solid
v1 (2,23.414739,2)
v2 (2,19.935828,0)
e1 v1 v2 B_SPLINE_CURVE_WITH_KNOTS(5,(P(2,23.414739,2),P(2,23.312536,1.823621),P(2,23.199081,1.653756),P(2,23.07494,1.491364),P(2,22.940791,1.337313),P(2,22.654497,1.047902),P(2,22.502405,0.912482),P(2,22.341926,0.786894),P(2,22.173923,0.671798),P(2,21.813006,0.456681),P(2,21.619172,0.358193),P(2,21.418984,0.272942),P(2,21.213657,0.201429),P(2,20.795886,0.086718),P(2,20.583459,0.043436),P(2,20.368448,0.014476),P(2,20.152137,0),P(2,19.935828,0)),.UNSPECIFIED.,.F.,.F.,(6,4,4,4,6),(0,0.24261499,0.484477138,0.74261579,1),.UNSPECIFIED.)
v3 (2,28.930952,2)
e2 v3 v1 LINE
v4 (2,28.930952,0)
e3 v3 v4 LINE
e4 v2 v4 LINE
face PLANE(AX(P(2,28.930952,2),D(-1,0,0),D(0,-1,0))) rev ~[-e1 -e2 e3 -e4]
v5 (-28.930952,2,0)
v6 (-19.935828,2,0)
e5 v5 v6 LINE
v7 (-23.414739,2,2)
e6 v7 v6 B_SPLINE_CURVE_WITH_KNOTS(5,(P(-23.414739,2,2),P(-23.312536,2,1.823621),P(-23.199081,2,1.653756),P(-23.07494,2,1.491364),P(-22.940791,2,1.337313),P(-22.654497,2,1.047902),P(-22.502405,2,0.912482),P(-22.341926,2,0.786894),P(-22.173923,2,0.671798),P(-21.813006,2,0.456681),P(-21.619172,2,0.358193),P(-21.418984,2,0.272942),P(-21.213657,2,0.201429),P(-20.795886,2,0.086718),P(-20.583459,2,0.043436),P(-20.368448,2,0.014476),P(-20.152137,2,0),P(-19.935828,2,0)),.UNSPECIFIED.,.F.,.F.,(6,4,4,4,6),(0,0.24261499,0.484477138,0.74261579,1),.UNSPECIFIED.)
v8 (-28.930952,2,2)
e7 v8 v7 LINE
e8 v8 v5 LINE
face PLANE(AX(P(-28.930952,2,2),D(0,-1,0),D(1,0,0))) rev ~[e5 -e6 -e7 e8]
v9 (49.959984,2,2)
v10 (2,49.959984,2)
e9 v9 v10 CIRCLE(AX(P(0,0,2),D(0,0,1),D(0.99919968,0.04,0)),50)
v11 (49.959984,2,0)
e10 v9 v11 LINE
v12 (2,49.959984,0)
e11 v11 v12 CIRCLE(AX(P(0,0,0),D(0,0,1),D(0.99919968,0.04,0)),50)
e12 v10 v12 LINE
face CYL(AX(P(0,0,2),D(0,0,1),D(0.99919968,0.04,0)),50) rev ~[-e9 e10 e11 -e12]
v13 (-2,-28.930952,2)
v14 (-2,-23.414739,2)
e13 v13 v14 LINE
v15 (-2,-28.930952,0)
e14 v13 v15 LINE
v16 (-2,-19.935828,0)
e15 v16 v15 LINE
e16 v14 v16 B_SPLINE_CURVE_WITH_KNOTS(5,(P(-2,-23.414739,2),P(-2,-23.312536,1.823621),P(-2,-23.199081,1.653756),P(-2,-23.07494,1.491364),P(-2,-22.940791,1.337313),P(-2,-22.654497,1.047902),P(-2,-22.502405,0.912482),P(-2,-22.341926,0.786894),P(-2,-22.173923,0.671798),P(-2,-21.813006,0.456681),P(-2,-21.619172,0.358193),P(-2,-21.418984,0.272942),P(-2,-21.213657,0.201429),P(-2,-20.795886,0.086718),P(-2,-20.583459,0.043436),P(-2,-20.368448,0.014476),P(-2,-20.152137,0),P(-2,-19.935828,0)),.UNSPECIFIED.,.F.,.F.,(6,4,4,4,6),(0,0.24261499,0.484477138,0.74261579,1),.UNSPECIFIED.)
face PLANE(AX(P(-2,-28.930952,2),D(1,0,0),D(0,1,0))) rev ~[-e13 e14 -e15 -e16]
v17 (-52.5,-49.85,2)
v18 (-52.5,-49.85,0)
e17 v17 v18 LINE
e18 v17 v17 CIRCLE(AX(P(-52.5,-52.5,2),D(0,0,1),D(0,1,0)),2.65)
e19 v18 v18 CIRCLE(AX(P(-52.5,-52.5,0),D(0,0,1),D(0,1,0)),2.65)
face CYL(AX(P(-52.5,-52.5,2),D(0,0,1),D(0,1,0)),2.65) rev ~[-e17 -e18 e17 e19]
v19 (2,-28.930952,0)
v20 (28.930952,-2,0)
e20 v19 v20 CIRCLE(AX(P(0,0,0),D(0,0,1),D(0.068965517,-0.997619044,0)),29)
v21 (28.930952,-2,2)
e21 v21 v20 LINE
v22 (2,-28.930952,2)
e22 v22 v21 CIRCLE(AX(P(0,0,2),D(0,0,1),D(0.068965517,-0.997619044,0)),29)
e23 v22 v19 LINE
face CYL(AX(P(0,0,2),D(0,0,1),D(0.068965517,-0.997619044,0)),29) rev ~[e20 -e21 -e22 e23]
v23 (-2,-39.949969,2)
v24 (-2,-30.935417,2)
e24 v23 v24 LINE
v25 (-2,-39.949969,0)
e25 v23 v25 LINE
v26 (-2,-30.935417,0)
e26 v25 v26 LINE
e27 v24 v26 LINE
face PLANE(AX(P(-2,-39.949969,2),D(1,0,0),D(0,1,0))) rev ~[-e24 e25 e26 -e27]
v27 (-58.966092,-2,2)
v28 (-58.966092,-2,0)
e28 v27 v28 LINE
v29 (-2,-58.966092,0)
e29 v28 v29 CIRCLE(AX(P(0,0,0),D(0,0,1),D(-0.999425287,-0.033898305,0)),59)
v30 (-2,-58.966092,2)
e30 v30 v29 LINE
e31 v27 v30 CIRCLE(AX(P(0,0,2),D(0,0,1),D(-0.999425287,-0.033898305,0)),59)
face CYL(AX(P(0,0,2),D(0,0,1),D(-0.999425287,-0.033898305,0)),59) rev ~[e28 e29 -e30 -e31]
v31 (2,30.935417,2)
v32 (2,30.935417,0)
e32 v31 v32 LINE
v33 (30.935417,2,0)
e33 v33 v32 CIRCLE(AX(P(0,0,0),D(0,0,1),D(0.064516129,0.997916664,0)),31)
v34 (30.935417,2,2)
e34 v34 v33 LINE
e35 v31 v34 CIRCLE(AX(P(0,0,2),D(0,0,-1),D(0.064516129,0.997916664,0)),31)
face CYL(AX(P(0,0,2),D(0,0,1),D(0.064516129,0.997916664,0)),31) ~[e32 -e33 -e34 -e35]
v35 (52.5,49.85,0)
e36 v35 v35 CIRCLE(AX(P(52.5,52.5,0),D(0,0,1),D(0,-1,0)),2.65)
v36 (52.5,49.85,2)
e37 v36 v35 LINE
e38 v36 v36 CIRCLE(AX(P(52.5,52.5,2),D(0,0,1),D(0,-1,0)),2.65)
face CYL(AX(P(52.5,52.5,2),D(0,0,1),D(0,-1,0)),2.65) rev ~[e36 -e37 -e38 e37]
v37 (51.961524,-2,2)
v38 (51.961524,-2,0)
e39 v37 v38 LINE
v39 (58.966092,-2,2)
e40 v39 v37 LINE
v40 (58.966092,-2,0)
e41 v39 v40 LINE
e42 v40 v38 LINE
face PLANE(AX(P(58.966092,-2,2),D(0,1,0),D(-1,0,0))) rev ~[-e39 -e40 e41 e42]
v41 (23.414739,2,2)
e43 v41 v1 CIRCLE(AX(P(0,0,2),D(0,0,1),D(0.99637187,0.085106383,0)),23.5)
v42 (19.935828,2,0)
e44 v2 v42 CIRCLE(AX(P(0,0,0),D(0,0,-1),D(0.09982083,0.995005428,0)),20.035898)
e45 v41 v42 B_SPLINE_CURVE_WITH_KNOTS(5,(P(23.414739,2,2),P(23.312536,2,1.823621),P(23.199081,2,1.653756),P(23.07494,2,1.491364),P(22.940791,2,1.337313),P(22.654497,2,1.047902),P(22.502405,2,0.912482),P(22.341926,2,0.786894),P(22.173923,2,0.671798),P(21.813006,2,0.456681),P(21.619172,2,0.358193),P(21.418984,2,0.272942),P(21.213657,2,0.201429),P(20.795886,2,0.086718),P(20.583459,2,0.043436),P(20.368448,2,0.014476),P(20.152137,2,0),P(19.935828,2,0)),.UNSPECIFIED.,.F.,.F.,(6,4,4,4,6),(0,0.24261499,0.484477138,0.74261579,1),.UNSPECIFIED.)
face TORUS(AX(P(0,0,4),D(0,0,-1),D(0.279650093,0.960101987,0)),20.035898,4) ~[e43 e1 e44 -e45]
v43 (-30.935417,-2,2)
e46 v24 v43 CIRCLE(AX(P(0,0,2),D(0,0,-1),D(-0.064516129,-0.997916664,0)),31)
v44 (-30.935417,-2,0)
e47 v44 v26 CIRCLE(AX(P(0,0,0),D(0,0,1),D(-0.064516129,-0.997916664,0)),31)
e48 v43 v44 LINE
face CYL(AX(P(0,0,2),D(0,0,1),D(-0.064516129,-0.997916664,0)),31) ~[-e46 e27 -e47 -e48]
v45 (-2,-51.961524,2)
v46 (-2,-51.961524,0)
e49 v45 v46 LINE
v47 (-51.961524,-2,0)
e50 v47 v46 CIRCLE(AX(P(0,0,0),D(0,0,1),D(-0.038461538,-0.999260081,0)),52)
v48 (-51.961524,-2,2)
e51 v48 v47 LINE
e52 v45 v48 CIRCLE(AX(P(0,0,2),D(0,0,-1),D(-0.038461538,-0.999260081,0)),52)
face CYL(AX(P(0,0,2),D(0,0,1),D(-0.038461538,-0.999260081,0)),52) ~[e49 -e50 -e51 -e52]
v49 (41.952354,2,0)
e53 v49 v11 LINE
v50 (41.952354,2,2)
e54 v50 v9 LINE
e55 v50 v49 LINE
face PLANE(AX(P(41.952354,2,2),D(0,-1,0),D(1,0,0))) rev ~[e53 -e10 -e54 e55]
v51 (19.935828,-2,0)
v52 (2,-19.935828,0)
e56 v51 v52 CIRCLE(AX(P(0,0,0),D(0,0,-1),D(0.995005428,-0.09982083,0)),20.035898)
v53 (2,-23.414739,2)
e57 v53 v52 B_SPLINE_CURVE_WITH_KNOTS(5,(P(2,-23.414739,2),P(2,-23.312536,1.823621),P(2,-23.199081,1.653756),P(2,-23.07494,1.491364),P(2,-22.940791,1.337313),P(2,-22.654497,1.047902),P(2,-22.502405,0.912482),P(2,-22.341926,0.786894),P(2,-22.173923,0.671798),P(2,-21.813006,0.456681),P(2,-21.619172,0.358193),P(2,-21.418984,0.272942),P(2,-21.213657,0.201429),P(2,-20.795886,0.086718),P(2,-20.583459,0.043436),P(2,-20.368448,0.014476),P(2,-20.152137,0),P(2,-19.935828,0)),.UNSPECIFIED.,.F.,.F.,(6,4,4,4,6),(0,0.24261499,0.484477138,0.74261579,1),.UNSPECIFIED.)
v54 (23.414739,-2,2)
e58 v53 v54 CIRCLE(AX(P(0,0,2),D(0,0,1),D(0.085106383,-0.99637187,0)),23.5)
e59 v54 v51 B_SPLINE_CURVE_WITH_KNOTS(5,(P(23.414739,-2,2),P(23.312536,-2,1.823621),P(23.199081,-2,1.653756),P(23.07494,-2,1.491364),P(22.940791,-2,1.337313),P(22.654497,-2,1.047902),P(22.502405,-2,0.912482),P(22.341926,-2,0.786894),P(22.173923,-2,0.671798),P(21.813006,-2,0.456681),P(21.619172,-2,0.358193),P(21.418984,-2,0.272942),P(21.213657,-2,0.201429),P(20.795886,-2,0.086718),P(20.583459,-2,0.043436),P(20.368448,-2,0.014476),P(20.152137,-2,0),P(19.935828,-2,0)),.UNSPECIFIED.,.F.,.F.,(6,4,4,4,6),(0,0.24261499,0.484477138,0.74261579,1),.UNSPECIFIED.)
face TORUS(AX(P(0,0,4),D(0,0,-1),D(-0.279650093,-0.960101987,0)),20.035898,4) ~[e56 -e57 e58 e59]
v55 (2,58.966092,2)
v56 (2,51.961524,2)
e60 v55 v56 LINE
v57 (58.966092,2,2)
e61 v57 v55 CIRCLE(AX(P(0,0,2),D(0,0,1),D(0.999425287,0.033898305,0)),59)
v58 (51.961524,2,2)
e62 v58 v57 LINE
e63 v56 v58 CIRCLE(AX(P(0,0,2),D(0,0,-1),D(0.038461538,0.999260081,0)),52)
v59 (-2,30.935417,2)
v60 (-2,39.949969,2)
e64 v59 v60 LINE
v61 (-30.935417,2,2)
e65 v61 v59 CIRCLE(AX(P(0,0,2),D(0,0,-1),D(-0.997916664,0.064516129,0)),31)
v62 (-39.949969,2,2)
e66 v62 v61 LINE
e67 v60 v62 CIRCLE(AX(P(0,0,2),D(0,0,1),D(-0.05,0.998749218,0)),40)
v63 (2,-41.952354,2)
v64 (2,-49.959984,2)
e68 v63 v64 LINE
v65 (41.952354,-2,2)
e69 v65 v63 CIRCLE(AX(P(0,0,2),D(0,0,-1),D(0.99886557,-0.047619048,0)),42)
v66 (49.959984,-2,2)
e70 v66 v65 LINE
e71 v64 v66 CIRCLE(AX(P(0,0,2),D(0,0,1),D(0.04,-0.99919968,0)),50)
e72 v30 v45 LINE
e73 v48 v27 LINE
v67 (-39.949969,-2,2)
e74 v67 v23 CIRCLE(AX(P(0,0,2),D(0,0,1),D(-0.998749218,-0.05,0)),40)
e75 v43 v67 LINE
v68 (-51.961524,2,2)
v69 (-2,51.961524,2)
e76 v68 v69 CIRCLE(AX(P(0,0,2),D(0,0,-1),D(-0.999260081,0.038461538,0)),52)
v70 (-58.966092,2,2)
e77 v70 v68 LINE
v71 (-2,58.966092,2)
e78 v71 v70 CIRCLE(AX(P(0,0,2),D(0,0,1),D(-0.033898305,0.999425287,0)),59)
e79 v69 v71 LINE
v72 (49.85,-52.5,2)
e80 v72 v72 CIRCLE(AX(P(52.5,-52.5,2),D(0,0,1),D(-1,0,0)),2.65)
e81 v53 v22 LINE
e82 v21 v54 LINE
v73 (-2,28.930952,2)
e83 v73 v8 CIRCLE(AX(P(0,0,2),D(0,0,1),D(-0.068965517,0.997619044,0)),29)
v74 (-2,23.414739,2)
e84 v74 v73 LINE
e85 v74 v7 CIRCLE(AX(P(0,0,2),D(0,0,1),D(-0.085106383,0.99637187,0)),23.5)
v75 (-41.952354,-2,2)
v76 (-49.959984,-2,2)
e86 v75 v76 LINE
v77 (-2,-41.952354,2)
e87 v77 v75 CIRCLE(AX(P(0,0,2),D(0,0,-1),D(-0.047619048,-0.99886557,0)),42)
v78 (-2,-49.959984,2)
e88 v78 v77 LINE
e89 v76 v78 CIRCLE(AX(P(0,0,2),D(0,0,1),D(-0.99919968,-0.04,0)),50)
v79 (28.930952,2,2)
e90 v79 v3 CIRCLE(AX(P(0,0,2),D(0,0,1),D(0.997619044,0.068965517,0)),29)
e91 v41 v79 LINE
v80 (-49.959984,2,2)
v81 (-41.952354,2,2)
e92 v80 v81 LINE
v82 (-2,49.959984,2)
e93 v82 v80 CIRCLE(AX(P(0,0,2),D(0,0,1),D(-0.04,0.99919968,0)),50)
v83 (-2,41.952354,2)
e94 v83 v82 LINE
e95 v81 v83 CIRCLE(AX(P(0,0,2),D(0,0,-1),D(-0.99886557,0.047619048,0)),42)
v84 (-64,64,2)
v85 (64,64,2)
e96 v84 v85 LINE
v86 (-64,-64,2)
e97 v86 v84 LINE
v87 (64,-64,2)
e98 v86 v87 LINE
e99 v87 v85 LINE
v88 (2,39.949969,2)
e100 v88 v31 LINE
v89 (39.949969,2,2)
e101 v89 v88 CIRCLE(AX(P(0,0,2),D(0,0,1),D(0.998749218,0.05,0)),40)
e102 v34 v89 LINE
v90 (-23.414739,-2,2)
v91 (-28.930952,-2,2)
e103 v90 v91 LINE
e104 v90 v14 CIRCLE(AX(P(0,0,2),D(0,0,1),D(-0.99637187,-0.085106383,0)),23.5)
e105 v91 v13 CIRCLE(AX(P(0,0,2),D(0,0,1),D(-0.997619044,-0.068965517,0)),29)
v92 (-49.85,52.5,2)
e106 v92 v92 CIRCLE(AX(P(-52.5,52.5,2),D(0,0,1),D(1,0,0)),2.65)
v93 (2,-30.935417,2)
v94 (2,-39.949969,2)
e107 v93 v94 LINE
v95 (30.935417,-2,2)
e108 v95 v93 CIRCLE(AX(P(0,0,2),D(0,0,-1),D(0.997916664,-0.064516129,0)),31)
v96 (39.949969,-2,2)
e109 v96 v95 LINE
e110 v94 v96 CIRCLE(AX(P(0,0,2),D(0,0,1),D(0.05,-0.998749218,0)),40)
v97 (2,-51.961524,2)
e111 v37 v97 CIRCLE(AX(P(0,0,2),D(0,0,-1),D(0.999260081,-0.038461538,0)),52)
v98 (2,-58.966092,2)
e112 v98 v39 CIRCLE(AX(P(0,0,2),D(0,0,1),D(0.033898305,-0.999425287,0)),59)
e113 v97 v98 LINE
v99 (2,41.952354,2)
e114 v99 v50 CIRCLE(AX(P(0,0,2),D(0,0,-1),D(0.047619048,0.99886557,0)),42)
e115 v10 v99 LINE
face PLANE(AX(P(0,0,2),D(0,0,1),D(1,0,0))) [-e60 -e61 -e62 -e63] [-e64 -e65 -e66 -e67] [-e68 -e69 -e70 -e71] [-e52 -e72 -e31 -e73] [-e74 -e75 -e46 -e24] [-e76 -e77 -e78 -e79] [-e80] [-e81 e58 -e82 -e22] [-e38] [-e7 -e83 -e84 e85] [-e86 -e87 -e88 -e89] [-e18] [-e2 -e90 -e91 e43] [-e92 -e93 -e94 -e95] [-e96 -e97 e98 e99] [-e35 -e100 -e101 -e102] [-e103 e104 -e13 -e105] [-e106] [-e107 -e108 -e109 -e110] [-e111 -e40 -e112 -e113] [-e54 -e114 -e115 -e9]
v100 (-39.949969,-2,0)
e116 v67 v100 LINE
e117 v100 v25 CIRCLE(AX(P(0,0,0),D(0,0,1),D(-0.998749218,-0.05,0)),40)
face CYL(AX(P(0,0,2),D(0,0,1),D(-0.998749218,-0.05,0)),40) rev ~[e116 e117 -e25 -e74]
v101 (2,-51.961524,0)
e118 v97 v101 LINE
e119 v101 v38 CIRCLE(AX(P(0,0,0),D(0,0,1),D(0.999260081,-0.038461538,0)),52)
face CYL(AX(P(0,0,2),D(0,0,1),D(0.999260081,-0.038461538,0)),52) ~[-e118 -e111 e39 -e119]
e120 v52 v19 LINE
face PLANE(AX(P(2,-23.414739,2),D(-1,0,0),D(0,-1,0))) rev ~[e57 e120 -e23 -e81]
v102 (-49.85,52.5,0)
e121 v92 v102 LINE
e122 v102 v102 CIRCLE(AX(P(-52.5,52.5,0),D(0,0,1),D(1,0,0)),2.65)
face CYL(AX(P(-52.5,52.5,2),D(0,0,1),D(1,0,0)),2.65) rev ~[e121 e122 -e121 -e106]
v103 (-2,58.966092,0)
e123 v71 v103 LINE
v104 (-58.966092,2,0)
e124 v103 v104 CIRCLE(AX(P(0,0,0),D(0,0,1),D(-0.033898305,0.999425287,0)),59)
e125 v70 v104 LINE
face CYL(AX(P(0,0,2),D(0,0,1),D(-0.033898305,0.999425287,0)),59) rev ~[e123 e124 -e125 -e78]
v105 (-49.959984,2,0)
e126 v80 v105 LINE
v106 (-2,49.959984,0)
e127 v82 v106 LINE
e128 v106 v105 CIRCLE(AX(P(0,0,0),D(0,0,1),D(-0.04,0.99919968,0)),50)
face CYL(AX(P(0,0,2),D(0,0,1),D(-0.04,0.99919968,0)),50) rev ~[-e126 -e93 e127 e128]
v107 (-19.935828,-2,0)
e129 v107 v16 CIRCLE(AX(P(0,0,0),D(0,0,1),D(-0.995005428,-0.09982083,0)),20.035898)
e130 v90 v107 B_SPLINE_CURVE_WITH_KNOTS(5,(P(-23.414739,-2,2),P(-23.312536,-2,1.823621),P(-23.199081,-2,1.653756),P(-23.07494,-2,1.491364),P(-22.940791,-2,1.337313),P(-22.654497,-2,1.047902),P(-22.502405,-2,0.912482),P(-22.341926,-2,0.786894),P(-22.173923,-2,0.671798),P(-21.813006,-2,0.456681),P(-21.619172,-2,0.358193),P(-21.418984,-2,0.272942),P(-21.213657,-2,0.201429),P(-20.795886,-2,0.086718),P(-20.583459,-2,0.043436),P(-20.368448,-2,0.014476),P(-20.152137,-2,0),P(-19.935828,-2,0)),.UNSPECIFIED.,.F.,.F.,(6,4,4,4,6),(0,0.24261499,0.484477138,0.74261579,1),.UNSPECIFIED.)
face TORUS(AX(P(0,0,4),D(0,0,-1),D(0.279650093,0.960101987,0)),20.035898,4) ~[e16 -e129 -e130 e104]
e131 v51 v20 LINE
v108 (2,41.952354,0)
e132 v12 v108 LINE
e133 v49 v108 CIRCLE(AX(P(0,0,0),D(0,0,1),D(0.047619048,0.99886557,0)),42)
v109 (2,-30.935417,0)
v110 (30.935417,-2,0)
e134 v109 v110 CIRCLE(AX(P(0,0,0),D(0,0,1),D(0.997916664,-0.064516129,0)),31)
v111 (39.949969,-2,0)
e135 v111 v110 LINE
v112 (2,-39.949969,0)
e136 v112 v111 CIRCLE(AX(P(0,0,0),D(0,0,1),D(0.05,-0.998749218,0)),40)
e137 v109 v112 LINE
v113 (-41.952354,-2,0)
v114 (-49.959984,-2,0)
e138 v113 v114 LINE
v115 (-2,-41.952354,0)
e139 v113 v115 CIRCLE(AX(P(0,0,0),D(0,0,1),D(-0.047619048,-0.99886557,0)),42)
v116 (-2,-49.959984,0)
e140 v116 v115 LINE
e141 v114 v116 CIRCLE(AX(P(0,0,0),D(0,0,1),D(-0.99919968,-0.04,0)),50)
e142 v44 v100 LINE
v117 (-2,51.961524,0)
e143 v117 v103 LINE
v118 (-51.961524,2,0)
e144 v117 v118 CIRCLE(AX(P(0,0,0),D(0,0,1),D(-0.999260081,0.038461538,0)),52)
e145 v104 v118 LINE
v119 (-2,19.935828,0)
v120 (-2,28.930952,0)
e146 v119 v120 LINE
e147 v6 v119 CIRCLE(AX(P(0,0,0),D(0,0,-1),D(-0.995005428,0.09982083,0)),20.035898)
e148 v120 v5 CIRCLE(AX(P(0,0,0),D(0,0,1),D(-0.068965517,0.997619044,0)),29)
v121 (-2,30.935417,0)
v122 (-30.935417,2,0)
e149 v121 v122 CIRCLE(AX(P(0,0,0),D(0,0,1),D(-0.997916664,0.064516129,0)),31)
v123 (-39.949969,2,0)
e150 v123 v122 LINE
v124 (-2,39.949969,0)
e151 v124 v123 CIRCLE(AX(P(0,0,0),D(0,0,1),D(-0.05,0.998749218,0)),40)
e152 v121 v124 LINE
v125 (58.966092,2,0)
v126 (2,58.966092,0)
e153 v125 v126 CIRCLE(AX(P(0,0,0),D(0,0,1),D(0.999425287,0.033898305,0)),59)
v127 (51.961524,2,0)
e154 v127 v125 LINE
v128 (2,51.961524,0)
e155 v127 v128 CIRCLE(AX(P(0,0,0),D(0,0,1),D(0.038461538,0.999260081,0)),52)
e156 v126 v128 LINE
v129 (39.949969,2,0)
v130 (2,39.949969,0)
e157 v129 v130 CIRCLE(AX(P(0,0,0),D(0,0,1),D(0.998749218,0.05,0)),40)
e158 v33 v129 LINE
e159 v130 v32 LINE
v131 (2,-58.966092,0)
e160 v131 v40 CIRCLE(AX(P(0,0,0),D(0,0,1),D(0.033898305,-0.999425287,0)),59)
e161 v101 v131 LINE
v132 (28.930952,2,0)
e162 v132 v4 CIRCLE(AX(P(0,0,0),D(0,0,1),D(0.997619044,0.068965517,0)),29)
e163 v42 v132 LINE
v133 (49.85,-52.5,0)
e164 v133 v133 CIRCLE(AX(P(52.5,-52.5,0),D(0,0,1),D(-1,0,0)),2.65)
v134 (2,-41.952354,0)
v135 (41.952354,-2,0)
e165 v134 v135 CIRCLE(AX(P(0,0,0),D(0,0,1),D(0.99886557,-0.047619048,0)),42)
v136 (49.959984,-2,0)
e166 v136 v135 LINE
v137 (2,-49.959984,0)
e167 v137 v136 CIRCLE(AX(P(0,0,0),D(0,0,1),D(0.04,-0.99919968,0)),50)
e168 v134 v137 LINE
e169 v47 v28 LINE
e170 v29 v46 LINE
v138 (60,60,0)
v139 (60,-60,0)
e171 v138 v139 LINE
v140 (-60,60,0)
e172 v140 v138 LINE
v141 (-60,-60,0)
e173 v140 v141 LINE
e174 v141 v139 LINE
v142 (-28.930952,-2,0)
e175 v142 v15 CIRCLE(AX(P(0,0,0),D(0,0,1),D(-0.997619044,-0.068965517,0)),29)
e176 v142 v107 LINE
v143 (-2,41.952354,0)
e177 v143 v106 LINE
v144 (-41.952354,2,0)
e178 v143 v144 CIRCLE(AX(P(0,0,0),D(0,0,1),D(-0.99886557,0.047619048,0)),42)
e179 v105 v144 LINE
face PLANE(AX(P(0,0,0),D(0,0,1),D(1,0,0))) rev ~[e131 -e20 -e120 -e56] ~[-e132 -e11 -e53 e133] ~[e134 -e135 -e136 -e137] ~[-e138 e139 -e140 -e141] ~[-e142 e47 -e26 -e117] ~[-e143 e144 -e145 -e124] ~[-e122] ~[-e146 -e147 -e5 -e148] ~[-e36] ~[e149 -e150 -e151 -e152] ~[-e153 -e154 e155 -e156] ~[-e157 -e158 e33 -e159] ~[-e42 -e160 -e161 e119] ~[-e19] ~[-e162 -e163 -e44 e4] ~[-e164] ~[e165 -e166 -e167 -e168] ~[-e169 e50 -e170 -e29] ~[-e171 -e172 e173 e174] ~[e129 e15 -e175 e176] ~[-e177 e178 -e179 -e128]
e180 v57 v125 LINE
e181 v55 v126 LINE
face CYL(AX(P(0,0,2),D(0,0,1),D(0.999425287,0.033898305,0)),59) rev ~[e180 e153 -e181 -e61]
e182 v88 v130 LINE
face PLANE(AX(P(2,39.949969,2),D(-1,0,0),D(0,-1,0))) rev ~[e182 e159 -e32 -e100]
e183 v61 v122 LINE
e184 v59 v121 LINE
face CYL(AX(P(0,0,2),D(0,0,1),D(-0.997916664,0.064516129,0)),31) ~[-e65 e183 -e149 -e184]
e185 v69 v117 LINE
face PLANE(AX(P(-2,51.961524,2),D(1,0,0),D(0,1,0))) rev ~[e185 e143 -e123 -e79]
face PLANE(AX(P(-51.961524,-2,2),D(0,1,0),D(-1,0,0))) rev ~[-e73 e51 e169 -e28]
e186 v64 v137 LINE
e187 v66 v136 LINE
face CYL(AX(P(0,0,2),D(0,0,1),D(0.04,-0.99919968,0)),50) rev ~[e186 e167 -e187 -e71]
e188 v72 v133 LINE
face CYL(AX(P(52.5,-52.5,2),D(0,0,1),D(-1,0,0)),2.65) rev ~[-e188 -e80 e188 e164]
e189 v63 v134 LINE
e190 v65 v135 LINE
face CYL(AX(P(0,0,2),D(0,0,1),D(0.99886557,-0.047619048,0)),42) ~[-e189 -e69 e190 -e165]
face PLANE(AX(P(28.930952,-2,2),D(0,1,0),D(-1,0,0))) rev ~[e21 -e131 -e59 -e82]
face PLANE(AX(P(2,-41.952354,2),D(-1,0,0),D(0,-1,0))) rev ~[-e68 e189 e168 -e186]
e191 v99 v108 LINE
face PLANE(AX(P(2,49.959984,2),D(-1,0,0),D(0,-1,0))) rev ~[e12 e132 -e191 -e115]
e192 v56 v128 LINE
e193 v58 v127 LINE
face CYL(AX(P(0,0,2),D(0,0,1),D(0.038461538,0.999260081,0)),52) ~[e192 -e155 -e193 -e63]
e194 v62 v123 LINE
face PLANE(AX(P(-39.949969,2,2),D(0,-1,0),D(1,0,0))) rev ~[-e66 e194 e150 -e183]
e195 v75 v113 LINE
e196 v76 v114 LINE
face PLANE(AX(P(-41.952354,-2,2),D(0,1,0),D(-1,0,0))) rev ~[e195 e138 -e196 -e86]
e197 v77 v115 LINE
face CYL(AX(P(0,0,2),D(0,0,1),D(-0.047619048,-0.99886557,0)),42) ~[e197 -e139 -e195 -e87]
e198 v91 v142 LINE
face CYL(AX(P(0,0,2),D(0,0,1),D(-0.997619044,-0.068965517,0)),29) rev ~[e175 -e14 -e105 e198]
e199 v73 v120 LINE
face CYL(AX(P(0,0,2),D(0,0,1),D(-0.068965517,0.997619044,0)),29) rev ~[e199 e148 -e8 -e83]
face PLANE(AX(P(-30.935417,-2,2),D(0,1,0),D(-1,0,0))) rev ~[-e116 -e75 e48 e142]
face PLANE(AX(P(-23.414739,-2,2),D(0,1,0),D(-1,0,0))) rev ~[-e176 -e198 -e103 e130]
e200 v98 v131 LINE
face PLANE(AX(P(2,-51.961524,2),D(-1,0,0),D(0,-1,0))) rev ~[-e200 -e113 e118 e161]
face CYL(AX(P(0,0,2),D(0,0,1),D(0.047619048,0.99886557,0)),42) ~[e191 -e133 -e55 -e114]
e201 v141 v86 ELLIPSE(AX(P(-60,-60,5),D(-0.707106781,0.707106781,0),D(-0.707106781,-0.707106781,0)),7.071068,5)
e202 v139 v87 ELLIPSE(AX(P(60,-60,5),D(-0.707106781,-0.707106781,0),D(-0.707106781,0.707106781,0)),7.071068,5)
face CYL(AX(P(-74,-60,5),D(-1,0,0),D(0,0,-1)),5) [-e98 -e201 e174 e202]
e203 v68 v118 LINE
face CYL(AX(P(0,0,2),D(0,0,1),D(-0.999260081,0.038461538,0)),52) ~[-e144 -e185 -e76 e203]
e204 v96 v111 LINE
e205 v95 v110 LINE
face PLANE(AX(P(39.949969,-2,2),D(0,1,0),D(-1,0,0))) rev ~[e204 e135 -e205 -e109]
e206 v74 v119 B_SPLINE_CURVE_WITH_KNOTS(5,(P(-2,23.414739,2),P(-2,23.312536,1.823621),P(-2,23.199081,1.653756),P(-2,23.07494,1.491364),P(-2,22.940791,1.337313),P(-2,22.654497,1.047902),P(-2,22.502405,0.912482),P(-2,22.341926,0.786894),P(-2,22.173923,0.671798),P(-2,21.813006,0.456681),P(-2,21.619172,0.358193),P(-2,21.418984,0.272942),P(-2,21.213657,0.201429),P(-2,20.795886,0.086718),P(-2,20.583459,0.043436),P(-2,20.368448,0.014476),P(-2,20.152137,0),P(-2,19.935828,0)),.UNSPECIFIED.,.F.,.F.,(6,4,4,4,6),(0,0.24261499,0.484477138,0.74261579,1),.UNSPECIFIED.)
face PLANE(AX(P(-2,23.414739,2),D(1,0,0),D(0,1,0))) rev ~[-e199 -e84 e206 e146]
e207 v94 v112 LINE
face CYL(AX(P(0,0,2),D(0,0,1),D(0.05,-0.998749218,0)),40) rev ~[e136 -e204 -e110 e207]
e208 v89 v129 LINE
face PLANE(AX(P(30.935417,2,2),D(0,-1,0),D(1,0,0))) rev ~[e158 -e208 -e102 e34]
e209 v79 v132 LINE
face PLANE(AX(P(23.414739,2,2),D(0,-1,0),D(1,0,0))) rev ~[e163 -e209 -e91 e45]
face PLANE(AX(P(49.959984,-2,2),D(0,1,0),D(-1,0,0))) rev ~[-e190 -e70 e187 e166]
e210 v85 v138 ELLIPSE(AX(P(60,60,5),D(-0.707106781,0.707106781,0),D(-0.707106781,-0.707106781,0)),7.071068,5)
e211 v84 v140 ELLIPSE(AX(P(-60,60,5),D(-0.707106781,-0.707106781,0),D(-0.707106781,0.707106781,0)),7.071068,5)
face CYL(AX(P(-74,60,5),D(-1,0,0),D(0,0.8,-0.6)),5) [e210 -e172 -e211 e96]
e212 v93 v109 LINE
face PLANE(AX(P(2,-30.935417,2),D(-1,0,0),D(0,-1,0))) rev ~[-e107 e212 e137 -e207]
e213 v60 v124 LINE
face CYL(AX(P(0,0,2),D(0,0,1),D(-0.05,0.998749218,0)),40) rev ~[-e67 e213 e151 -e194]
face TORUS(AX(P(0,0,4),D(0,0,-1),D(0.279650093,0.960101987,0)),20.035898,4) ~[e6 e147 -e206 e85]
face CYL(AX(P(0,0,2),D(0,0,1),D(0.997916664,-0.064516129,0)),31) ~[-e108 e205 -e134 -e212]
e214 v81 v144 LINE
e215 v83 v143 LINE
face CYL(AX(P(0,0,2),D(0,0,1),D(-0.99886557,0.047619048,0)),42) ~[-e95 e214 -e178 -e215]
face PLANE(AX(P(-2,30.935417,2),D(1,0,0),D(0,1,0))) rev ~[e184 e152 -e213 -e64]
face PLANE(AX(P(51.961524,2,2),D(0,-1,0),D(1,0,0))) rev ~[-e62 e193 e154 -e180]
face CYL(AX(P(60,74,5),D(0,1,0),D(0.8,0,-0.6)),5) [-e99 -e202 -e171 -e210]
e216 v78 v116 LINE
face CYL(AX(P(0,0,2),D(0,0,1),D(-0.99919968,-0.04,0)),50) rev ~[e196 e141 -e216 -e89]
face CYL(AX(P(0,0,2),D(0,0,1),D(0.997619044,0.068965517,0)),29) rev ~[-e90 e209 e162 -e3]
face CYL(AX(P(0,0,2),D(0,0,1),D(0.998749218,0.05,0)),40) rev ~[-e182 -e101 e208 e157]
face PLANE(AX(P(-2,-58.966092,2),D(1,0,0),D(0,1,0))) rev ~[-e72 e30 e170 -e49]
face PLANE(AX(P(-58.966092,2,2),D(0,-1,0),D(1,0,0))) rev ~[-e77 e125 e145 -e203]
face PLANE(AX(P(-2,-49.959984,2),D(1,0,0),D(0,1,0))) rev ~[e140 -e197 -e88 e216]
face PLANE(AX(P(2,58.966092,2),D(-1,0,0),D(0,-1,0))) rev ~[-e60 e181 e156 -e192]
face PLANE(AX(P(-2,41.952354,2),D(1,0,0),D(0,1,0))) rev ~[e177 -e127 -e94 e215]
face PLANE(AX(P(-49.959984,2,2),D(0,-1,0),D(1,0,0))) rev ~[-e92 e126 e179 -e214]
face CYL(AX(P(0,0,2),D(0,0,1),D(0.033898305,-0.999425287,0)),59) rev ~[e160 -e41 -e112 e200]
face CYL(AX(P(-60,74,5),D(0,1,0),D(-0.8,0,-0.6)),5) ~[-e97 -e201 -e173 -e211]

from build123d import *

# Parameters (mm, degrees)
F0_W            = 128
F0_H            = 128
F1_DEPTH        = 2
F3_DEPTH        = 25
F4_R            = 2.65
F5_DEPTH        = 25
F5_COPIES_COUNT = 4
F6_T1_DEPTH     = 148
F6_T3_DEPTH     = 148
F7_T4_ANGLE     = 122.478644554
F7_T9_ANGLE     = 122.478644554
F7_T15_ANGLE    = 122.478644554
F7_T20_ANGLE    = 122.478644554
F7_T25_ANGLE    = 122.478644554
F7_T31_ANGLE    = 122.478644554
F7_T36_ANGLE    = 122.478644554
F7_T41_ANGLE    = 122.478644554
F7_T47_ANGLE    = 122.478644554
F7_T52_ANGLE    = 122.478644554
F7_T57_ANGLE    = 122.478644554
F7_T63_ANGLE    = 122.478644554


# Not quite as in the source:
# - a fillet or chamfer that OpenCascade refuses, or shapes differently, is made with other operations: its cross-section is extruded or revolved along the edge and cut away or added
# - a pattern or mirror of a feature is missing from the dataset's text; its kind, count and spacing are read off the source's solid
# - a feature names something its author has since deleted; it is built from what else it names


with BuildPart() as f1:
    # F0 (on Top) → F1 (new body)
    with BuildSketch(Plane.XY):
        Rectangle(F0_W, F0_H)
    extrude(amount=F1_DEPTH)

    # F2 (on face) → F3 (cut)
    with BuildSketch(Plane.XY.offset(2)):
        with BuildLine():
            Line((51.9615242271, 2), (58.9660919512, 2))
            ThreePointArc((58.9660919512, 2), (41.71930009, 41.71930009), (2, 58.9660919512))
            Line((2, 58.9660919512), (2, 51.9615242271))
            ThreePointArc((2, 51.9615242271), (36.7695526217, 36.7695526217), (51.9615242271, 2))
        make_face()
        with BuildLine():
            Line((41.9523539268, 2), (49.9599839872, 2))
            ThreePointArc((49.9599839872, 2), (35.3553390593, 35.3553390593), (2, 49.9599839872))
            Line((2, 49.9599839872), (2, 41.9523539268))
            ThreePointArc((2, 41.9523539268), (29.6984848098, 29.6984848098), (41.9523539268, 2))
        make_face()
        with BuildLine():
            Line((30.9354165965, 2), (39.9499687109, 2))
            ThreePointArc((39.9499687109, 2), (28.2842712475, 28.2842712475), (2, 39.9499687109))
            Line((2, 39.9499687109), (2, 30.9354165965))
            ThreePointArc((2, 30.9354165965), (21.9203102168, 21.9203102168), (30.9354165965, 2))
        make_face()
        with BuildLine():
            Line((23.4147389479, 2), (28.930952283, 2))
            ThreePointArc((28.930952283, 2), (20.5060966544, 20.5060966544), (2, 28.930952283))
            Line((2, 28.930952283), (2, 23.4147389479))
            ThreePointArc((2, 23.4147389479), (16.6170093579, 16.6170093579), (23.4147389479, 2))
        make_face()
        with BuildLine():
            ThreePointArc((2, -28.930952283), (20.5060966544, -20.5060966544), (28.930952283, -2))
            Line((28.930952283, -2), (23.4147389479, -2))
            ThreePointArc((23.4147389479, -2), (16.6170093579, -16.6170093579), (2, -23.4147389479))
            Line((2, -23.4147389479), (2, -28.930952283))
        make_face()
        with BuildLine():
            ThreePointArc((2, -39.9499687109), (28.2842712475, -28.2842712475), (39.9499687109, -2))
            Line((39.9499687109, -2), (30.9354165965, -2))
            ThreePointArc((30.9354165965, -2), (21.9203102168, -21.9203102168), (2, -30.9354165965))
            Line((2, -30.9354165965), (2, -39.9499687109))
        make_face()
        with BuildLine():
            ThreePointArc((2, -49.9599839872), (35.3553390593, -35.3553390593), (49.9599839872, -2))
            Line((49.9599839872, -2), (41.9523539268, -2))
            ThreePointArc((41.9523539268, -2), (29.6984848098, -29.6984848098), (2, -41.9523539268))
            Line((2, -41.9523539268), (2, -49.9599839872))
        make_face()
        with BuildLine():
            ThreePointArc((2, -58.9660919512), (41.71930009, -41.71930009), (58.9660919512, -2))
            Line((58.9660919512, -2), (51.9615242271, -2))
            ThreePointArc((51.9615242271, -2), (36.7695526217, -36.7695526217), (2, -51.9615242271))
            Line((2, -51.9615242271), (2, -58.9660919512))
        make_face()
        with BuildLine():
            ThreePointArc((-28.930952283, -2), (-20.5060966544, -20.5060966544), (-2, -28.930952283))
            Line((-2, -28.930952283), (-2, -23.4147389479))
            ThreePointArc((-2, -23.4147389479), (-16.6170093579, -16.6170093579), (-23.4147389479, -2))
            Line((-23.4147389479, -2), (-28.930952283, -2))
        make_face()
        with BuildLine():
            ThreePointArc((-39.9499687109, -2), (-28.2842712475, -28.2842712475), (-2, -39.9499687109))
            Line((-2, -39.9499687109), (-2, -30.9354165965))
            ThreePointArc((-2, -30.9354165965), (-21.9203102168, -21.9203102168), (-30.9354165965, -2))
            Line((-30.9354165965, -2), (-39.9499687109, -2))
        make_face()
        with BuildLine():
            ThreePointArc((-49.9599839872, -2), (-35.3553390593, -35.3553390593), (-2, -49.9599839872))
            Line((-2, -49.9599839872), (-2, -41.9523539268))
            ThreePointArc((-2, -41.9523539268), (-29.6984848098, -29.6984848098), (-41.9523539268, -2))
            Line((-41.9523539268, -2), (-49.9599839872, -2))
        make_face()
        with BuildLine():
            ThreePointArc((-58.9660919512, -2), (-41.71930009, -41.71930009), (-2, -58.9660919512))
            Line((-2, -58.9660919512), (-2, -51.9615242271))
            ThreePointArc((-2, -51.9615242271), (-36.7695526217, -36.7695526217), (-51.9615242271, -2))
            Line((-51.9615242271, -2), (-58.9660919512, -2))
        make_face()
        with BuildLine():
            Line((-2, 23.4147389479), (-2, 28.930952283))
            ThreePointArc((-2, 28.930952283), (-20.5060966544, 20.5060966544), (-28.930952283, 2))
            Line((-28.930952283, 2), (-23.4147389479, 2))
            ThreePointArc((-23.4147389479, 2), (-16.6170093579, 16.6170093579), (-2, 23.4147389479))
        make_face()
        with BuildLine():
            Line((-2, 30.9354165965), (-2, 39.9499687109))
            ThreePointArc((-2, 39.9499687109), (-28.2842712475, 28.2842712475), (-39.9499687109, 2))
            Line((-39.9499687109, 2), (-30.9354165965, 2))
            ThreePointArc((-30.9354165965, 2), (-21.9203102168, 21.9203102168), (-2, 30.9354165965))
        make_face()
        with BuildLine():
            Line((-2, 41.9523539268), (-2, 49.9599839872))
            ThreePointArc((-2, 49.9599839872), (-35.3553390593, 35.3553390593), (-49.9599839872, 2))
            Line((-49.9599839872, 2), (-41.9523539268, 2))
            ThreePointArc((-41.9523539268, 2), (-29.6984848098, 29.6984848098), (-2, 41.9523539268))
        make_face()
        with BuildLine():
            Line((-2, 51.9615242271), (-2, 58.9660919512))
            ThreePointArc((-2, 58.9660919512), (-41.71930009, 41.71930009), (-58.9660919512, 2))
            Line((-58.9660919512, 2), (-51.9615242271, 2))
            ThreePointArc((-51.9615242271, 2), (-36.7695526217, 36.7695526217), (-2, 51.9615242271))
        make_face()
    extrude(amount=-F3_DEPTH, mode=Mode.SUBTRACT)

    # F4 (on face) → F5 (cut)
    with BuildSketch(Plane.XY.offset(2)):
        with Locations((-52.5, 52.5)):
            Circle(F4_R)
    f5 = extrude(amount=-F5_DEPTH, mode=Mode.SUBTRACT)

    # F5_copies: F5 ×4 about axis
    f5_copies_axis = Axis((0, 0, 0), (0, 0, 1))
    for i in range(1, F5_COPIES_COUNT):
        add(f5.rotate(f5_copies_axis, i * 360 / F5_COPIES_COUNT), mode=Mode.SUBTRACT)

    # F6: fillet of radius 5 on 4 edges, made by hand

    # F6_s2 → F6_t1 (cut)
    with BuildSketch(Plane.YZ.offset(-74)):
        with BuildLine():
            ThreePointArc((-60, 0), (-62.2360679775, 0.527864045), (-64, 2))
            Line((-64, 2), (-64, 0))
            Line((-64, 0), (-60, 0))
        make_face()
        with BuildLine():
            ThreePointArc((64, 2), (62.2360679775, 0.527864045), (60, 0))
            Line((60, 0), (64, 0))
            Line((64, 0), (64, 2))
        make_face()
    extrude(amount=F6_T1_DEPTH, mode=Mode.SUBTRACT)

    # F6_s4 → F6_t3 (cut)
    with BuildSketch(Plane.XZ.offset(-74)):
        with BuildLine():
            ThreePointArc((-64, 2), (-62.2360679775, 0.527864045), (-60, 0))
            Line((-60, 0), (-64, 0))
            Line((-64, 0), (-64, 2))
        make_face()
        with BuildLine():
            ThreePointArc((64, 2), (62.2360679775, 0.527864045), (60, 0))
            Line((60, 0), (64, 0))
            Line((64, 0), (64, 2))
        make_face()
    extrude(amount=F6_T3_DEPTH, mode=Mode.SUBTRACT)

    # F7: fillet of radius 4 on 4 edges, made by hand


with BuildPart() as f7_tool2:
    # F7_s3 → F7_t4 (revolve)
    with BuildSketch(Plane(origin=(0, 0, 0), x_dir=(0, 0, 1), z_dir=(0.960101987, -0.2796500929, 0))):
        with BuildLine():
            ThreePointArc((2, -23.5), (0.5358983849, -22.0358983849), (0, -20.0358983849))
            Line((0, -20.0358983849), (0, -23.5))
            Line((0, -23.5), (2, -23.5))
        make_face()
    revolve(axis=Axis((0, 0, 0), (0, 0, 1)), revolution_arc=F7_T4_ANGLE)

    split(bisect_by=Plane.YZ.offset(2), keep=Keep.TOP)


with BuildPart() as f1_1:
    add(f1.part)

    # F7_t1: cut F7_tool2
    add(f7_tool2.part, mode=Mode.SUBTRACT)


with BuildPart() as f7_tool7:
    # F7_s8 → F7_t9 (revolve)
    with BuildSketch(Plane(origin=(0, 0, 0), x_dir=(0, 0, 1), z_dir=(0.960101987, -0.2796500929, 0))):
        with BuildLine():
            ThreePointArc((2, -23.5), (0.5358983849, -22.0358983849), (0, -20.0358983849))
            Line((0, -20.0358983849), (0, -23.5))
            Line((0, -23.5), (2, -23.5))
        make_face()
    revolve(axis=Axis((0, 0, 0), (0, 0, 1)), revolution_arc=F7_T9_ANGLE)

    split(bisect_by=Plane.YZ.offset(-2), keep=Keep.BOTTOM)

    split(bisect_by=Plane.XZ.offset(-2), keep=Keep.BOTTOM)


with BuildPart() as f1_2:
    add(f1_1.part)

    # F7_t6: cut F7_tool7
    add(f7_tool7.part, mode=Mode.SUBTRACT)


with BuildPart() as f7_tool13:
    # F7_s14 → F7_t15 (revolve)
    with BuildSketch(Plane(origin=(0, 0, 0), x_dir=(0, 0, 1), z_dir=(0.960101987, -0.2796500929, 0))):
        with BuildLine():
            ThreePointArc((2, -23.5), (0.5358983849, -22.0358983849), (0, -20.0358983849))
            Line((0, -20.0358983849), (0, -23.5))
            Line((0, -23.5), (2, -23.5))
        make_face()
    revolve(axis=Axis((0, 0, 0), (0, 0, 1)), revolution_arc=F7_T15_ANGLE)

    split(bisect_by=Plane.XZ.offset(2), keep=Keep.TOP)


with BuildPart() as f1_3:
    add(f1_2.part)

    # F7_t12: cut F7_tool13
    add(f7_tool13.part, mode=Mode.SUBTRACT)


with BuildPart() as f7_tool18:
    # F7_s19 → F7_t20 (revolve)
    with BuildSketch(Plane(origin=(0, 0, 0), x_dir=(0, 0, 1), z_dir=(-0.2796500929, -0.960101987, 0))):
        with BuildLine():
            ThreePointArc((2, -23.5), (0.5358983849, -22.0358983849), (0, -20.0358983849))
            Line((0, -20.0358983849), (0, -23.5))
            Line((0, -23.5), (2, -23.5))
        make_face()
    revolve(axis=Axis((0, 0, 0), (0, 0, 1)), revolution_arc=F7_T20_ANGLE)

    split(bisect_by=Plane.XZ.offset(2), keep=Keep.TOP)


with BuildPart() as f1_4:
    add(f1_3.part)

    # F7_t17: cut F7_tool18
    add(f7_tool18.part, mode=Mode.SUBTRACT)


with BuildPart() as f7_tool23:
    # F7_s24 → F7_t25 (revolve)
    with BuildSketch(Plane(origin=(0, 0, 0), x_dir=(0, 0, 1), z_dir=(-0.2796500929, -0.960101987, 0))):
        with BuildLine():
            ThreePointArc((2, -23.5), (0.5358983849, -22.0358983849), (0, -20.0358983849))
            Line((0, -20.0358983849), (0, -23.5))
            Line((0, -23.5), (2, -23.5))
        make_face()
    revolve(axis=Axis((0, 0, 0), (0, 0, 1)), revolution_arc=F7_T25_ANGLE)

    split(bisect_by=Plane.XZ.offset(-2), keep=Keep.BOTTOM)

    split(bisect_by=Plane.YZ.offset(2), keep=Keep.TOP)


with BuildPart() as f1_5:
    add(f1_4.part)

    # F7_t22: cut F7_tool23
    add(f7_tool23.part, mode=Mode.SUBTRACT)


with BuildPart() as f7_tool29:
    # F7_s30 → F7_t31 (revolve)
    with BuildSketch(Plane(origin=(0, 0, 0), x_dir=(0, 0, 1), z_dir=(-0.2796500929, -0.960101987, 0))):
        with BuildLine():
            ThreePointArc((2, -23.5), (0.5358983849, -22.0358983849), (0, -20.0358983849))
            Line((0, -20.0358983849), (0, -23.5))
            Line((0, -23.5), (2, -23.5))
        make_face()
    revolve(axis=Axis((0, 0, 0), (0, 0, 1)), revolution_arc=F7_T31_ANGLE)

    split(bisect_by=Plane.YZ.offset(-2), keep=Keep.BOTTOM)


with BuildPart() as f1_6:
    add(f1_5.part)

    # F7_t28: cut F7_tool29
    add(f7_tool29.part, mode=Mode.SUBTRACT)


with BuildPart() as f7_tool34:
    # F7_s35 → F7_t36 (revolve)
    with BuildSketch(Plane(origin=(0, 0, 0), x_dir=(0, 0, 1), z_dir=(-0.960101987, 0.2796500929, 0))):
        with BuildLine():
            ThreePointArc((2, -23.5), (0.5358983849, -22.0358983849), (0, -20.0358983849))
            Line((0, -20.0358983849), (0, -23.5))
            Line((0, -23.5), (2, -23.5))
        make_face()
    revolve(axis=Axis((0, 0, 0), (0, 0, 1)), revolution_arc=F7_T36_ANGLE)

    split(bisect_by=Plane.YZ.offset(-2), keep=Keep.BOTTOM)


with BuildPart() as f1_7:
    add(f1_6.part)

    # F7_t33: cut F7_tool34
    add(f7_tool34.part, mode=Mode.SUBTRACT)


with BuildPart() as f7_tool39:
    # F7_s40 → F7_t41 (revolve)
    with BuildSketch(Plane(origin=(0, 0, 0), x_dir=(0, 0, 1), z_dir=(-0.960101987, 0.2796500929, 0))):
        with BuildLine():
            ThreePointArc((2, -23.5), (0.5358983849, -22.0358983849), (0, -20.0358983849))
            Line((0, -20.0358983849), (0, -23.5))
            Line((0, -23.5), (2, -23.5))
        make_face()
    revolve(axis=Axis((0, 0, 0), (0, 0, 1)), revolution_arc=F7_T41_ANGLE)

    split(bisect_by=Plane.XZ.offset(2), keep=Keep.TOP)

    split(bisect_by=Plane.YZ.offset(2), keep=Keep.TOP)


with BuildPart() as f1_8:
    add(f1_7.part)

    # F7_t38: cut F7_tool39
    add(f7_tool39.part, mode=Mode.SUBTRACT)


with BuildPart() as f7_tool45:
    # F7_s46 → F7_t47 (revolve)
    with BuildSketch(Plane(origin=(0, 0, 0), x_dir=(0, 0, 1), z_dir=(-0.960101987, 0.2796500929, 0))):
        with BuildLine():
            ThreePointArc((2, -23.5), (0.5358983849, -22.0358983849), (0, -20.0358983849))
            Line((0, -20.0358983849), (0, -23.5))
            Line((0, -23.5), (2, -23.5))
        make_face()
    revolve(axis=Axis((0, 0, 0), (0, 0, 1)), revolution_arc=F7_T47_ANGLE)

    split(bisect_by=Plane.XZ.offset(-2), keep=Keep.BOTTOM)


with BuildPart() as f1_9:
    add(f1_8.part)

    # F7_t44: cut F7_tool45
    add(f7_tool45.part, mode=Mode.SUBTRACT)


with BuildPart() as f7_tool50:
    # F7_s51 → F7_t52 (revolve)
    with BuildSketch(Plane(origin=(0, 0, 0), x_dir=(0, 0, 1), z_dir=(0.2796500929, 0.960101987, 0))):
        with BuildLine():
            ThreePointArc((2, -23.5), (0.5358983849, -22.0358983849), (0, -20.0358983849))
            Line((0, -20.0358983849), (0, -23.5))
            Line((0, -23.5), (2, -23.5))
        make_face()
    revolve(axis=Axis((0, 0, 0), (0, 0, 1)), revolution_arc=F7_T52_ANGLE)

    split(bisect_by=Plane.XZ.offset(-2), keep=Keep.BOTTOM)


with BuildPart() as f1_10:
    add(f1_9.part)

    # F7_t49: cut F7_tool50
    add(f7_tool50.part, mode=Mode.SUBTRACT)


with BuildPart() as f7_tool55:
    # F7_s56 → F7_t57 (revolve)
    with BuildSketch(Plane(origin=(0, 0, 0), x_dir=(0, 0, 1), z_dir=(0.2796500929, 0.960101987, 0))):
        with BuildLine():
            ThreePointArc((2, -23.5), (0.5358983849, -22.0358983849), (0, -20.0358983849))
            Line((0, -20.0358983849), (0, -23.5))
            Line((0, -23.5), (2, -23.5))
        make_face()
    revolve(axis=Axis((0, 0, 0), (0, 0, 1)), revolution_arc=F7_T57_ANGLE)

    split(bisect_by=Plane.YZ.offset(-2), keep=Keep.BOTTOM)

    split(bisect_by=Plane.XZ.offset(2), keep=Keep.TOP)


with BuildPart() as f1_11:
    add(f1_10.part)

    # F7_t54: cut F7_tool55
    add(f7_tool55.part, mode=Mode.SUBTRACT)


with BuildPart() as f7_tool61:
    # F7_s62 → F7_t63 (revolve)
    with BuildSketch(Plane(origin=(0, 0, 0), x_dir=(0, 0, 1), z_dir=(0.2796500929, 0.960101987, 0))):
        with BuildLine():
            ThreePointArc((2, -23.5), (0.5358983849, -22.0358983849), (0, -20.0358983849))
            Line((0, -20.0358983849), (0, -23.5))
            Line((0, -23.5), (2, -23.5))
        make_face()
    revolve(axis=Axis((0, 0, 0), (0, 0, 1)), revolution_arc=F7_T63_ANGLE)

    split(bisect_by=Plane.YZ.offset(2), keep=Keep.TOP)


with BuildPart() as f1_12:
    add(f1_11.part)

    # F7_t60: cut F7_tool61
    add(f7_tool61.part, mode=Mode.SUBTRACT)


solid = f1_12.part
